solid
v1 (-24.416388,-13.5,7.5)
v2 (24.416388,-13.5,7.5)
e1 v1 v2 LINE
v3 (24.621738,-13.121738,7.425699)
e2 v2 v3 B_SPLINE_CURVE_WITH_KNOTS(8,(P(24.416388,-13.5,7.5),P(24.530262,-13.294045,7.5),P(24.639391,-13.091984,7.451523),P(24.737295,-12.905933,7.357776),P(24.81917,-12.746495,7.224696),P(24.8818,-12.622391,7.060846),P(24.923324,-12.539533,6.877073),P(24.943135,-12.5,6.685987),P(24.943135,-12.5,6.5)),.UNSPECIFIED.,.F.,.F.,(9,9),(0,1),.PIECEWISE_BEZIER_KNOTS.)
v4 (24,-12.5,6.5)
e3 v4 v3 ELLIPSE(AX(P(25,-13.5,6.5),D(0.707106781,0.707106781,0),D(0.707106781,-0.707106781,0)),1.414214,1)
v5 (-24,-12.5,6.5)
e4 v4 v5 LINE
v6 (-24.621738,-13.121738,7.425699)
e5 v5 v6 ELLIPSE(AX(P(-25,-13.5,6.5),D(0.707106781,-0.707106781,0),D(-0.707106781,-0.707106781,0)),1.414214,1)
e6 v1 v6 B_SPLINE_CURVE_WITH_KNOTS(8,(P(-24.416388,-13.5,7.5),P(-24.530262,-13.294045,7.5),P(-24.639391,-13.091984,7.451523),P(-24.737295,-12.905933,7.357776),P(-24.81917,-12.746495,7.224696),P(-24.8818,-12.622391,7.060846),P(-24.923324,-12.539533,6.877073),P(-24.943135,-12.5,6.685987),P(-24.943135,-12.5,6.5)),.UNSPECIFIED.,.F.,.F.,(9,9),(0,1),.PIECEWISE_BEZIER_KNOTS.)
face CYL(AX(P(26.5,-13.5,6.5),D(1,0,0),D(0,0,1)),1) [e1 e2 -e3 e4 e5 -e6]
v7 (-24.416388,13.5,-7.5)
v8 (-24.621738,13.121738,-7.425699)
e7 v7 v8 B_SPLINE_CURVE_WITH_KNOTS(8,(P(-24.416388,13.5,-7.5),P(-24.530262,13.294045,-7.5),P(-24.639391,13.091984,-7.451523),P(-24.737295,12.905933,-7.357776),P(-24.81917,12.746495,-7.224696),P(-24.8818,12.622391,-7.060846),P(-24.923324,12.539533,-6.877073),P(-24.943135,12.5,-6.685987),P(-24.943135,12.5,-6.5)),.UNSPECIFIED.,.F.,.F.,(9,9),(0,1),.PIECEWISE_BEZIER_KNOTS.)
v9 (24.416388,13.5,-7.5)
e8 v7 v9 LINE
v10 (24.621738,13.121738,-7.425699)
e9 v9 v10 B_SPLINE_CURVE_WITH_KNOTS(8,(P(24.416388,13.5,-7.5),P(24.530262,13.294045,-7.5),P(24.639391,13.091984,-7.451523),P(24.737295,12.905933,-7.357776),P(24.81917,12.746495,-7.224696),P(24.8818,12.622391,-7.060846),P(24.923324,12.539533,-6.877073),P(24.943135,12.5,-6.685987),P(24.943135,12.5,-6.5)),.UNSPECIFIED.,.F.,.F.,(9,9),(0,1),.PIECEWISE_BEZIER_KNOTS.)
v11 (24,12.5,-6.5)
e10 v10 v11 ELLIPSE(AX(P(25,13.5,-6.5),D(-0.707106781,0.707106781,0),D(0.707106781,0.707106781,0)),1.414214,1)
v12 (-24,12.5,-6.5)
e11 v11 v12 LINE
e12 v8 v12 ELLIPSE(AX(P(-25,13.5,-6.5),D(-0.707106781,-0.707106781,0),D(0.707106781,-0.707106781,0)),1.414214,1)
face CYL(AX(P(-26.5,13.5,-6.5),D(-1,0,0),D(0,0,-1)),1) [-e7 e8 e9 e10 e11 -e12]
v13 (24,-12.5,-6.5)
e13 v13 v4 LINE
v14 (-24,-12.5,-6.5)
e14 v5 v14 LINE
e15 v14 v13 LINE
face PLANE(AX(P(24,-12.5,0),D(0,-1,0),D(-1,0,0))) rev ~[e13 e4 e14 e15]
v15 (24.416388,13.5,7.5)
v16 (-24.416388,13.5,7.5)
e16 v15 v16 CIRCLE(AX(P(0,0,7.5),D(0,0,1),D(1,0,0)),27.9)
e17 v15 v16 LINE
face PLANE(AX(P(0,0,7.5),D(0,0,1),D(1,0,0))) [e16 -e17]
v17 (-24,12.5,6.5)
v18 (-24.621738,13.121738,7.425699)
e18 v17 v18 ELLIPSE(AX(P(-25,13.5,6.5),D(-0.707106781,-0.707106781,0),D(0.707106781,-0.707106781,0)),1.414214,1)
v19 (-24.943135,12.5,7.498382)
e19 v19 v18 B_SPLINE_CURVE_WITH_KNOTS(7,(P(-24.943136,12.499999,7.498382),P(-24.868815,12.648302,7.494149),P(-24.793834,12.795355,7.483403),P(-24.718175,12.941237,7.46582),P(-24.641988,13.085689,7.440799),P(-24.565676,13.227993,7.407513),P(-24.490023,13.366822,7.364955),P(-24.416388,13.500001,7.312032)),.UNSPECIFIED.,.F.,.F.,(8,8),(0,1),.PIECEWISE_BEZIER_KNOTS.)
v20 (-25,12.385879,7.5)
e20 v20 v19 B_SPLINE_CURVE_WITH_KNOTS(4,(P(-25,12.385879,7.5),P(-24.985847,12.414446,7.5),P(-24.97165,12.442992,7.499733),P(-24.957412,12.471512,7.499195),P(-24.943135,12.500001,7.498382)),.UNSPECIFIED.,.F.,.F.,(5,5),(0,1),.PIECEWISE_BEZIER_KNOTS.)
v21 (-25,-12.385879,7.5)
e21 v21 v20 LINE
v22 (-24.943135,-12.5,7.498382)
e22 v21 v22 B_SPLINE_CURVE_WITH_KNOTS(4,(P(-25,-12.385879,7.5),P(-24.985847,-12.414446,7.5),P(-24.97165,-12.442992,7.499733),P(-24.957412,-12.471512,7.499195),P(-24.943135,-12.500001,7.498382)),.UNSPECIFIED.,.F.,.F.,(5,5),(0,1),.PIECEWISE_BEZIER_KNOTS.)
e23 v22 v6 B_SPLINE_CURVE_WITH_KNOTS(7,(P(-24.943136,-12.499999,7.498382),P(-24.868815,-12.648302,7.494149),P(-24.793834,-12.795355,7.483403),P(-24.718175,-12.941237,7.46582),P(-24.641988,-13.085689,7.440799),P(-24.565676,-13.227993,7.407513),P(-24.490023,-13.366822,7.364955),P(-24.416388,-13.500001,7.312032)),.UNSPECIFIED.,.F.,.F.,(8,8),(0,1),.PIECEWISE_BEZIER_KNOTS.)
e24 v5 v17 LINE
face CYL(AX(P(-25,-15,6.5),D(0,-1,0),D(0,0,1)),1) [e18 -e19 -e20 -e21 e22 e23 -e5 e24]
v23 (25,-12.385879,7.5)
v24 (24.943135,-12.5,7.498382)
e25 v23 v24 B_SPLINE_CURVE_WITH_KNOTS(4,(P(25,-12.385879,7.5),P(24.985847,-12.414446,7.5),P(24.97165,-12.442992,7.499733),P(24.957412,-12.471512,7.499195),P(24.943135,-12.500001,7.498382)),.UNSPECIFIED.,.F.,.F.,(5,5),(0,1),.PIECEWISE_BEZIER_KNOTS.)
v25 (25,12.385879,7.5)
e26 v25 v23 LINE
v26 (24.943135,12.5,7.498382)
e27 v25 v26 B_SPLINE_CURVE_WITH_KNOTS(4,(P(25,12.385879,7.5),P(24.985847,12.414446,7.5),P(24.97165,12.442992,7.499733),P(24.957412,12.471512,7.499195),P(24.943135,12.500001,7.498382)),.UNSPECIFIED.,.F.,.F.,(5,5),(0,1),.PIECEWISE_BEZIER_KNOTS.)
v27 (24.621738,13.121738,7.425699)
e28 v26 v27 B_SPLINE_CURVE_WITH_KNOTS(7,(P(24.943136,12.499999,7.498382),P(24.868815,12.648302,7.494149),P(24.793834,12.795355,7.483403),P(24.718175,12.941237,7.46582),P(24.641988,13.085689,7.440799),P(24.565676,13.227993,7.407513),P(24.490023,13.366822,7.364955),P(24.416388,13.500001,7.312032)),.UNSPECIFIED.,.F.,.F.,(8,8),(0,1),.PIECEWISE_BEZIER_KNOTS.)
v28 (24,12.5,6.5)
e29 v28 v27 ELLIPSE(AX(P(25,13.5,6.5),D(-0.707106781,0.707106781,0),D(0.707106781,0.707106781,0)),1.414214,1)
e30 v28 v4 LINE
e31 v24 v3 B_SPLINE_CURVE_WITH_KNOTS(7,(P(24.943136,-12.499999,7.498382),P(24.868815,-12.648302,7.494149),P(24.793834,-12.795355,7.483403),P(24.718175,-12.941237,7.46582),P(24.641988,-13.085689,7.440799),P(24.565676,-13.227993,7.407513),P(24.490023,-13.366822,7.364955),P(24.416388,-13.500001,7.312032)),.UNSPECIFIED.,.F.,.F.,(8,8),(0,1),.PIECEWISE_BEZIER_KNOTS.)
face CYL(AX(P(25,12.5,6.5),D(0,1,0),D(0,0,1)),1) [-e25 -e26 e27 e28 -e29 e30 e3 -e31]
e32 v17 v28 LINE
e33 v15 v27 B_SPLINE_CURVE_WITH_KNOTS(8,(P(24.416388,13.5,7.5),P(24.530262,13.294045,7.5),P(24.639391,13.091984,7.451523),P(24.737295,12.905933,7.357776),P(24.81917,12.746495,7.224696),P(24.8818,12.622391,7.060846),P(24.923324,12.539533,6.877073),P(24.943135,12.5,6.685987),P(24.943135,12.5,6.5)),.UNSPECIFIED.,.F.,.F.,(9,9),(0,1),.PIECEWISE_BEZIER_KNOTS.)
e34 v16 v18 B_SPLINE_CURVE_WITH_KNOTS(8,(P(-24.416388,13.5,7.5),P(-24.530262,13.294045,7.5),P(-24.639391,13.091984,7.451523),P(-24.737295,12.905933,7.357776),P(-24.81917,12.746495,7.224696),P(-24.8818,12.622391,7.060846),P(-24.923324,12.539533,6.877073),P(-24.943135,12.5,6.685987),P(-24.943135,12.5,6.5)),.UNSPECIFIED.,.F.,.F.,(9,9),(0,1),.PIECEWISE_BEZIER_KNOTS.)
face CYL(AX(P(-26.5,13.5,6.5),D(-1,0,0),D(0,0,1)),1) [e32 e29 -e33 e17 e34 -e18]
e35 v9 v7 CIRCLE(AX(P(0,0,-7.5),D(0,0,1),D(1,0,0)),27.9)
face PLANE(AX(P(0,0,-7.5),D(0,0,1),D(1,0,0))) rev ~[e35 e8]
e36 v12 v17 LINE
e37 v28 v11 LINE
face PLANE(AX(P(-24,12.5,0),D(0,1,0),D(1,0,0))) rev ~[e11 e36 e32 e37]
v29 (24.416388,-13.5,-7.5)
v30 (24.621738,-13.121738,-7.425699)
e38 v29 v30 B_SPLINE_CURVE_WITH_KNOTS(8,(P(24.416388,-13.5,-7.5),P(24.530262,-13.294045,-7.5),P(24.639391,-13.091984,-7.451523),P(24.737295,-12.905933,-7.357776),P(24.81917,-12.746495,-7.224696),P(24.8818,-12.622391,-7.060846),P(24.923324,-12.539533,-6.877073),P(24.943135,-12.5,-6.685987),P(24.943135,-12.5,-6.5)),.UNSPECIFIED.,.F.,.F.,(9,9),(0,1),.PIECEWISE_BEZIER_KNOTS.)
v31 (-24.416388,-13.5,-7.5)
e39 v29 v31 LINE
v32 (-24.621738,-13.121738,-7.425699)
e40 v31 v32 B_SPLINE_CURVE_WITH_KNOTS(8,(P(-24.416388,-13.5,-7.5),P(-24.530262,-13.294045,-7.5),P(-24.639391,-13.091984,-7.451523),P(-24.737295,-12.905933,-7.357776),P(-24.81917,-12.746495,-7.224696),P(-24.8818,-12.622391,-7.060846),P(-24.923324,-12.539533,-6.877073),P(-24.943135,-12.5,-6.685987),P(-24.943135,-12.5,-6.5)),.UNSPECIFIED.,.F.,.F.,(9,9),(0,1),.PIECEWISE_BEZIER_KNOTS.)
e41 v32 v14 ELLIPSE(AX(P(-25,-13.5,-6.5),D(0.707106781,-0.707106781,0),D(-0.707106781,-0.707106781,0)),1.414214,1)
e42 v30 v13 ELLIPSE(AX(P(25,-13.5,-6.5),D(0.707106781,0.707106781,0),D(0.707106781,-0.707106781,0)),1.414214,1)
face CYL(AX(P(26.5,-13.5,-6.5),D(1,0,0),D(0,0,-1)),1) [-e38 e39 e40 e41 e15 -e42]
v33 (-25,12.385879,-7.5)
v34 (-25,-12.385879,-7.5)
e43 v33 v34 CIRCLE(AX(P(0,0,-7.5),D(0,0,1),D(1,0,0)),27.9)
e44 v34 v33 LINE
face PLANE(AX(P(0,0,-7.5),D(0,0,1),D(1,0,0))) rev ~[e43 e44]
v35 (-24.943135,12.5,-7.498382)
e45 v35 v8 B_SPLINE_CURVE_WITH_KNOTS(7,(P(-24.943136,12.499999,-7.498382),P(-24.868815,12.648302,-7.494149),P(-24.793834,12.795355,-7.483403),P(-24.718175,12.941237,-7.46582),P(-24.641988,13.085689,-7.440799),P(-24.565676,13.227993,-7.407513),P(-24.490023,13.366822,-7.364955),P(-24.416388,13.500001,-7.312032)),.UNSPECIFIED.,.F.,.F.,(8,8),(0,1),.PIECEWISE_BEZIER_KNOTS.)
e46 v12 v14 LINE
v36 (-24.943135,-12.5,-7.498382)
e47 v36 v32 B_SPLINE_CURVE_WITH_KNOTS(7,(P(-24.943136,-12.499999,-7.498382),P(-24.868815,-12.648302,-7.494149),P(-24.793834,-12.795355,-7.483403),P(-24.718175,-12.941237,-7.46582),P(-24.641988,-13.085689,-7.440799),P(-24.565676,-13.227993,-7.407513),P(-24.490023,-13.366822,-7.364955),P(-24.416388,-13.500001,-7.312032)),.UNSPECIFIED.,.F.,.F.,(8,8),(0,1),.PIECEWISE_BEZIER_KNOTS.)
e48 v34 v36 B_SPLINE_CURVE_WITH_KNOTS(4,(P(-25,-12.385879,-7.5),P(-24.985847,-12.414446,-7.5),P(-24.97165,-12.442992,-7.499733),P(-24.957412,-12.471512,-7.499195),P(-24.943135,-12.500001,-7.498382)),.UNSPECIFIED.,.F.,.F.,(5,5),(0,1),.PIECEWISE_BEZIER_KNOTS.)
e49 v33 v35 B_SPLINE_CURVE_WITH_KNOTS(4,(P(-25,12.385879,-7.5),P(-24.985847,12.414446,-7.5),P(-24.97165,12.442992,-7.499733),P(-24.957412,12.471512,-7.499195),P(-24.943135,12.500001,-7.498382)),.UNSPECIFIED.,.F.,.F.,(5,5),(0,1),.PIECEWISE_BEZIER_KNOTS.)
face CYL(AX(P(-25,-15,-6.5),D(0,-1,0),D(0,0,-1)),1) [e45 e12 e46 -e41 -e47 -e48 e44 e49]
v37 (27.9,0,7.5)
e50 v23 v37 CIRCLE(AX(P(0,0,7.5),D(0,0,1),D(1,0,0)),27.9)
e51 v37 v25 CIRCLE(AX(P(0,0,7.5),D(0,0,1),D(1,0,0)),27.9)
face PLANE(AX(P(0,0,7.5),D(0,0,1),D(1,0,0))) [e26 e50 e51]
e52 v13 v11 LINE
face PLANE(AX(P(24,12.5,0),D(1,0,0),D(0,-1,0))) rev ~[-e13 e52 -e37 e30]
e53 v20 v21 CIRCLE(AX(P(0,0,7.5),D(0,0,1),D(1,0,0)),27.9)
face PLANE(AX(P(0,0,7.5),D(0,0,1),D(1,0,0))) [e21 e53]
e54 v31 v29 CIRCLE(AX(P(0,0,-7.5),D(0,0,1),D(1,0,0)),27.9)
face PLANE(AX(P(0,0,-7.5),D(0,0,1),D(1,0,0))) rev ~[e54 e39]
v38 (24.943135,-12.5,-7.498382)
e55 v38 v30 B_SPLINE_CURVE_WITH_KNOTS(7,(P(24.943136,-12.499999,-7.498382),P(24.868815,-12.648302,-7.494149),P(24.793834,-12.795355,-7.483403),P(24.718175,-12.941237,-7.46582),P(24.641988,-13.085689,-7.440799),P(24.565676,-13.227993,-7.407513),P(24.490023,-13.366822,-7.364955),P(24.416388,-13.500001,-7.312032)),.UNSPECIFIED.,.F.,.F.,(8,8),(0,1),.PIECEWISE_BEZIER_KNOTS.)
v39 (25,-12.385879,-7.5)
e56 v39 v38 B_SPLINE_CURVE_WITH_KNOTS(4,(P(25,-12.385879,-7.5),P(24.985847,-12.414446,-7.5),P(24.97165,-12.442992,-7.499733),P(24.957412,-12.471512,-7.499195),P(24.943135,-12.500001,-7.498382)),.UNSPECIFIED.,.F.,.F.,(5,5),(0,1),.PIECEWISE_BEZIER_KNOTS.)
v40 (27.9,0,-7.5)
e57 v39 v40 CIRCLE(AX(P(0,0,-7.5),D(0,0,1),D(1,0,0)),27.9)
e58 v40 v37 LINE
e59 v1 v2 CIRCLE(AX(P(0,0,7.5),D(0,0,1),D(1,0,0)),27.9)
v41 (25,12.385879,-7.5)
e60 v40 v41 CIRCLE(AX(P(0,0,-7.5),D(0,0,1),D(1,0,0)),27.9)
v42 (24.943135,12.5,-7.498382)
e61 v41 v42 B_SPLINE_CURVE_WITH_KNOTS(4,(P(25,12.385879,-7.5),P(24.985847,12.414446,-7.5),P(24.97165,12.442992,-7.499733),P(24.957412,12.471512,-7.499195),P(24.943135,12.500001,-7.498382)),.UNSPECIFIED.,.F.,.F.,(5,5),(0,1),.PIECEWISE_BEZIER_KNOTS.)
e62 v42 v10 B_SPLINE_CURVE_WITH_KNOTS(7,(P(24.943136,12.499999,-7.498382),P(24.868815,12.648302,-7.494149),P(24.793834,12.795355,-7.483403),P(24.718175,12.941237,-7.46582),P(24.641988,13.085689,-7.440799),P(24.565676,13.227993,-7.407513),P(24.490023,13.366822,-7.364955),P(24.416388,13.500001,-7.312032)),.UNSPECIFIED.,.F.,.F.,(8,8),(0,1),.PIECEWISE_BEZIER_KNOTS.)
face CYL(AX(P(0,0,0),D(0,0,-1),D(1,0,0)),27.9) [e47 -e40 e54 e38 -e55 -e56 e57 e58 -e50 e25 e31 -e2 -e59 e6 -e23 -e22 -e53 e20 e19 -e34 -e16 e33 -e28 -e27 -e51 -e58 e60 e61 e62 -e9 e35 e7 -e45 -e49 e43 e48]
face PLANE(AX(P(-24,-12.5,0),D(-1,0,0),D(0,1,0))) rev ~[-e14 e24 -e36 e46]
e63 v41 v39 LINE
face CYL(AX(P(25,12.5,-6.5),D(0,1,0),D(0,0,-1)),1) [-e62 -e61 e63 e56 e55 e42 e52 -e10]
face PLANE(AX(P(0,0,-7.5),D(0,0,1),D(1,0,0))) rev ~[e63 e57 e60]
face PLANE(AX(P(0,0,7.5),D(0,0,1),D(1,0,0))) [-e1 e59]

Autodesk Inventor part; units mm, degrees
ref_plane "YZ Plane" through (0, 0, 0) normal (1, 0, 0) x (0, 1, 0)
ref_plane "XZ Plane" through (0, 0, 0) normal (0, 1, 0) x (-1, 0, 0)
ref_plane "XY Plane" through (0, 0, 0) normal (0, 0, 1) x (1, 0, 0)
sketch "Sketch1" plane through (0, 0, 0) normal (0, 0, 1) x (1, 0, 0)
  circle A0 centre (0, 0) radius 27.9
  line L0 (-24, 12.5) -> (24, 12.5)
  line L1 (24, 12.5) -> (24, -12.5)
  line L2 (24, -12.5) -> (-24, -12.5)
  line L3 (-24, -12.5) -> (-24, 12.5)
  dimension "d0" = 55.8
  dimension "d1" = 48
  dimension "d2" = 24
  dimension "d3" = 25
  dimension "d4" = 12.5
extrude "Extrusion1" add sketch "Sketch1" along normal mid plane 15
fillet "Fillet1" radius 1 8 edges at (0, 12.5, 7.5) (-24, 0, 7.5) (0, -12.5, 7.5) (24, 0, 7.5) (0, 12.5, -7.5) (-24, 0, -7.5) (0, -12.5, -7.5) (24, 0, -7.5)
equation "\"d2\" = 0.5 * d1"
equation "\"d4\" = 0.5 * d3"
properties part number "soporte central pila"
